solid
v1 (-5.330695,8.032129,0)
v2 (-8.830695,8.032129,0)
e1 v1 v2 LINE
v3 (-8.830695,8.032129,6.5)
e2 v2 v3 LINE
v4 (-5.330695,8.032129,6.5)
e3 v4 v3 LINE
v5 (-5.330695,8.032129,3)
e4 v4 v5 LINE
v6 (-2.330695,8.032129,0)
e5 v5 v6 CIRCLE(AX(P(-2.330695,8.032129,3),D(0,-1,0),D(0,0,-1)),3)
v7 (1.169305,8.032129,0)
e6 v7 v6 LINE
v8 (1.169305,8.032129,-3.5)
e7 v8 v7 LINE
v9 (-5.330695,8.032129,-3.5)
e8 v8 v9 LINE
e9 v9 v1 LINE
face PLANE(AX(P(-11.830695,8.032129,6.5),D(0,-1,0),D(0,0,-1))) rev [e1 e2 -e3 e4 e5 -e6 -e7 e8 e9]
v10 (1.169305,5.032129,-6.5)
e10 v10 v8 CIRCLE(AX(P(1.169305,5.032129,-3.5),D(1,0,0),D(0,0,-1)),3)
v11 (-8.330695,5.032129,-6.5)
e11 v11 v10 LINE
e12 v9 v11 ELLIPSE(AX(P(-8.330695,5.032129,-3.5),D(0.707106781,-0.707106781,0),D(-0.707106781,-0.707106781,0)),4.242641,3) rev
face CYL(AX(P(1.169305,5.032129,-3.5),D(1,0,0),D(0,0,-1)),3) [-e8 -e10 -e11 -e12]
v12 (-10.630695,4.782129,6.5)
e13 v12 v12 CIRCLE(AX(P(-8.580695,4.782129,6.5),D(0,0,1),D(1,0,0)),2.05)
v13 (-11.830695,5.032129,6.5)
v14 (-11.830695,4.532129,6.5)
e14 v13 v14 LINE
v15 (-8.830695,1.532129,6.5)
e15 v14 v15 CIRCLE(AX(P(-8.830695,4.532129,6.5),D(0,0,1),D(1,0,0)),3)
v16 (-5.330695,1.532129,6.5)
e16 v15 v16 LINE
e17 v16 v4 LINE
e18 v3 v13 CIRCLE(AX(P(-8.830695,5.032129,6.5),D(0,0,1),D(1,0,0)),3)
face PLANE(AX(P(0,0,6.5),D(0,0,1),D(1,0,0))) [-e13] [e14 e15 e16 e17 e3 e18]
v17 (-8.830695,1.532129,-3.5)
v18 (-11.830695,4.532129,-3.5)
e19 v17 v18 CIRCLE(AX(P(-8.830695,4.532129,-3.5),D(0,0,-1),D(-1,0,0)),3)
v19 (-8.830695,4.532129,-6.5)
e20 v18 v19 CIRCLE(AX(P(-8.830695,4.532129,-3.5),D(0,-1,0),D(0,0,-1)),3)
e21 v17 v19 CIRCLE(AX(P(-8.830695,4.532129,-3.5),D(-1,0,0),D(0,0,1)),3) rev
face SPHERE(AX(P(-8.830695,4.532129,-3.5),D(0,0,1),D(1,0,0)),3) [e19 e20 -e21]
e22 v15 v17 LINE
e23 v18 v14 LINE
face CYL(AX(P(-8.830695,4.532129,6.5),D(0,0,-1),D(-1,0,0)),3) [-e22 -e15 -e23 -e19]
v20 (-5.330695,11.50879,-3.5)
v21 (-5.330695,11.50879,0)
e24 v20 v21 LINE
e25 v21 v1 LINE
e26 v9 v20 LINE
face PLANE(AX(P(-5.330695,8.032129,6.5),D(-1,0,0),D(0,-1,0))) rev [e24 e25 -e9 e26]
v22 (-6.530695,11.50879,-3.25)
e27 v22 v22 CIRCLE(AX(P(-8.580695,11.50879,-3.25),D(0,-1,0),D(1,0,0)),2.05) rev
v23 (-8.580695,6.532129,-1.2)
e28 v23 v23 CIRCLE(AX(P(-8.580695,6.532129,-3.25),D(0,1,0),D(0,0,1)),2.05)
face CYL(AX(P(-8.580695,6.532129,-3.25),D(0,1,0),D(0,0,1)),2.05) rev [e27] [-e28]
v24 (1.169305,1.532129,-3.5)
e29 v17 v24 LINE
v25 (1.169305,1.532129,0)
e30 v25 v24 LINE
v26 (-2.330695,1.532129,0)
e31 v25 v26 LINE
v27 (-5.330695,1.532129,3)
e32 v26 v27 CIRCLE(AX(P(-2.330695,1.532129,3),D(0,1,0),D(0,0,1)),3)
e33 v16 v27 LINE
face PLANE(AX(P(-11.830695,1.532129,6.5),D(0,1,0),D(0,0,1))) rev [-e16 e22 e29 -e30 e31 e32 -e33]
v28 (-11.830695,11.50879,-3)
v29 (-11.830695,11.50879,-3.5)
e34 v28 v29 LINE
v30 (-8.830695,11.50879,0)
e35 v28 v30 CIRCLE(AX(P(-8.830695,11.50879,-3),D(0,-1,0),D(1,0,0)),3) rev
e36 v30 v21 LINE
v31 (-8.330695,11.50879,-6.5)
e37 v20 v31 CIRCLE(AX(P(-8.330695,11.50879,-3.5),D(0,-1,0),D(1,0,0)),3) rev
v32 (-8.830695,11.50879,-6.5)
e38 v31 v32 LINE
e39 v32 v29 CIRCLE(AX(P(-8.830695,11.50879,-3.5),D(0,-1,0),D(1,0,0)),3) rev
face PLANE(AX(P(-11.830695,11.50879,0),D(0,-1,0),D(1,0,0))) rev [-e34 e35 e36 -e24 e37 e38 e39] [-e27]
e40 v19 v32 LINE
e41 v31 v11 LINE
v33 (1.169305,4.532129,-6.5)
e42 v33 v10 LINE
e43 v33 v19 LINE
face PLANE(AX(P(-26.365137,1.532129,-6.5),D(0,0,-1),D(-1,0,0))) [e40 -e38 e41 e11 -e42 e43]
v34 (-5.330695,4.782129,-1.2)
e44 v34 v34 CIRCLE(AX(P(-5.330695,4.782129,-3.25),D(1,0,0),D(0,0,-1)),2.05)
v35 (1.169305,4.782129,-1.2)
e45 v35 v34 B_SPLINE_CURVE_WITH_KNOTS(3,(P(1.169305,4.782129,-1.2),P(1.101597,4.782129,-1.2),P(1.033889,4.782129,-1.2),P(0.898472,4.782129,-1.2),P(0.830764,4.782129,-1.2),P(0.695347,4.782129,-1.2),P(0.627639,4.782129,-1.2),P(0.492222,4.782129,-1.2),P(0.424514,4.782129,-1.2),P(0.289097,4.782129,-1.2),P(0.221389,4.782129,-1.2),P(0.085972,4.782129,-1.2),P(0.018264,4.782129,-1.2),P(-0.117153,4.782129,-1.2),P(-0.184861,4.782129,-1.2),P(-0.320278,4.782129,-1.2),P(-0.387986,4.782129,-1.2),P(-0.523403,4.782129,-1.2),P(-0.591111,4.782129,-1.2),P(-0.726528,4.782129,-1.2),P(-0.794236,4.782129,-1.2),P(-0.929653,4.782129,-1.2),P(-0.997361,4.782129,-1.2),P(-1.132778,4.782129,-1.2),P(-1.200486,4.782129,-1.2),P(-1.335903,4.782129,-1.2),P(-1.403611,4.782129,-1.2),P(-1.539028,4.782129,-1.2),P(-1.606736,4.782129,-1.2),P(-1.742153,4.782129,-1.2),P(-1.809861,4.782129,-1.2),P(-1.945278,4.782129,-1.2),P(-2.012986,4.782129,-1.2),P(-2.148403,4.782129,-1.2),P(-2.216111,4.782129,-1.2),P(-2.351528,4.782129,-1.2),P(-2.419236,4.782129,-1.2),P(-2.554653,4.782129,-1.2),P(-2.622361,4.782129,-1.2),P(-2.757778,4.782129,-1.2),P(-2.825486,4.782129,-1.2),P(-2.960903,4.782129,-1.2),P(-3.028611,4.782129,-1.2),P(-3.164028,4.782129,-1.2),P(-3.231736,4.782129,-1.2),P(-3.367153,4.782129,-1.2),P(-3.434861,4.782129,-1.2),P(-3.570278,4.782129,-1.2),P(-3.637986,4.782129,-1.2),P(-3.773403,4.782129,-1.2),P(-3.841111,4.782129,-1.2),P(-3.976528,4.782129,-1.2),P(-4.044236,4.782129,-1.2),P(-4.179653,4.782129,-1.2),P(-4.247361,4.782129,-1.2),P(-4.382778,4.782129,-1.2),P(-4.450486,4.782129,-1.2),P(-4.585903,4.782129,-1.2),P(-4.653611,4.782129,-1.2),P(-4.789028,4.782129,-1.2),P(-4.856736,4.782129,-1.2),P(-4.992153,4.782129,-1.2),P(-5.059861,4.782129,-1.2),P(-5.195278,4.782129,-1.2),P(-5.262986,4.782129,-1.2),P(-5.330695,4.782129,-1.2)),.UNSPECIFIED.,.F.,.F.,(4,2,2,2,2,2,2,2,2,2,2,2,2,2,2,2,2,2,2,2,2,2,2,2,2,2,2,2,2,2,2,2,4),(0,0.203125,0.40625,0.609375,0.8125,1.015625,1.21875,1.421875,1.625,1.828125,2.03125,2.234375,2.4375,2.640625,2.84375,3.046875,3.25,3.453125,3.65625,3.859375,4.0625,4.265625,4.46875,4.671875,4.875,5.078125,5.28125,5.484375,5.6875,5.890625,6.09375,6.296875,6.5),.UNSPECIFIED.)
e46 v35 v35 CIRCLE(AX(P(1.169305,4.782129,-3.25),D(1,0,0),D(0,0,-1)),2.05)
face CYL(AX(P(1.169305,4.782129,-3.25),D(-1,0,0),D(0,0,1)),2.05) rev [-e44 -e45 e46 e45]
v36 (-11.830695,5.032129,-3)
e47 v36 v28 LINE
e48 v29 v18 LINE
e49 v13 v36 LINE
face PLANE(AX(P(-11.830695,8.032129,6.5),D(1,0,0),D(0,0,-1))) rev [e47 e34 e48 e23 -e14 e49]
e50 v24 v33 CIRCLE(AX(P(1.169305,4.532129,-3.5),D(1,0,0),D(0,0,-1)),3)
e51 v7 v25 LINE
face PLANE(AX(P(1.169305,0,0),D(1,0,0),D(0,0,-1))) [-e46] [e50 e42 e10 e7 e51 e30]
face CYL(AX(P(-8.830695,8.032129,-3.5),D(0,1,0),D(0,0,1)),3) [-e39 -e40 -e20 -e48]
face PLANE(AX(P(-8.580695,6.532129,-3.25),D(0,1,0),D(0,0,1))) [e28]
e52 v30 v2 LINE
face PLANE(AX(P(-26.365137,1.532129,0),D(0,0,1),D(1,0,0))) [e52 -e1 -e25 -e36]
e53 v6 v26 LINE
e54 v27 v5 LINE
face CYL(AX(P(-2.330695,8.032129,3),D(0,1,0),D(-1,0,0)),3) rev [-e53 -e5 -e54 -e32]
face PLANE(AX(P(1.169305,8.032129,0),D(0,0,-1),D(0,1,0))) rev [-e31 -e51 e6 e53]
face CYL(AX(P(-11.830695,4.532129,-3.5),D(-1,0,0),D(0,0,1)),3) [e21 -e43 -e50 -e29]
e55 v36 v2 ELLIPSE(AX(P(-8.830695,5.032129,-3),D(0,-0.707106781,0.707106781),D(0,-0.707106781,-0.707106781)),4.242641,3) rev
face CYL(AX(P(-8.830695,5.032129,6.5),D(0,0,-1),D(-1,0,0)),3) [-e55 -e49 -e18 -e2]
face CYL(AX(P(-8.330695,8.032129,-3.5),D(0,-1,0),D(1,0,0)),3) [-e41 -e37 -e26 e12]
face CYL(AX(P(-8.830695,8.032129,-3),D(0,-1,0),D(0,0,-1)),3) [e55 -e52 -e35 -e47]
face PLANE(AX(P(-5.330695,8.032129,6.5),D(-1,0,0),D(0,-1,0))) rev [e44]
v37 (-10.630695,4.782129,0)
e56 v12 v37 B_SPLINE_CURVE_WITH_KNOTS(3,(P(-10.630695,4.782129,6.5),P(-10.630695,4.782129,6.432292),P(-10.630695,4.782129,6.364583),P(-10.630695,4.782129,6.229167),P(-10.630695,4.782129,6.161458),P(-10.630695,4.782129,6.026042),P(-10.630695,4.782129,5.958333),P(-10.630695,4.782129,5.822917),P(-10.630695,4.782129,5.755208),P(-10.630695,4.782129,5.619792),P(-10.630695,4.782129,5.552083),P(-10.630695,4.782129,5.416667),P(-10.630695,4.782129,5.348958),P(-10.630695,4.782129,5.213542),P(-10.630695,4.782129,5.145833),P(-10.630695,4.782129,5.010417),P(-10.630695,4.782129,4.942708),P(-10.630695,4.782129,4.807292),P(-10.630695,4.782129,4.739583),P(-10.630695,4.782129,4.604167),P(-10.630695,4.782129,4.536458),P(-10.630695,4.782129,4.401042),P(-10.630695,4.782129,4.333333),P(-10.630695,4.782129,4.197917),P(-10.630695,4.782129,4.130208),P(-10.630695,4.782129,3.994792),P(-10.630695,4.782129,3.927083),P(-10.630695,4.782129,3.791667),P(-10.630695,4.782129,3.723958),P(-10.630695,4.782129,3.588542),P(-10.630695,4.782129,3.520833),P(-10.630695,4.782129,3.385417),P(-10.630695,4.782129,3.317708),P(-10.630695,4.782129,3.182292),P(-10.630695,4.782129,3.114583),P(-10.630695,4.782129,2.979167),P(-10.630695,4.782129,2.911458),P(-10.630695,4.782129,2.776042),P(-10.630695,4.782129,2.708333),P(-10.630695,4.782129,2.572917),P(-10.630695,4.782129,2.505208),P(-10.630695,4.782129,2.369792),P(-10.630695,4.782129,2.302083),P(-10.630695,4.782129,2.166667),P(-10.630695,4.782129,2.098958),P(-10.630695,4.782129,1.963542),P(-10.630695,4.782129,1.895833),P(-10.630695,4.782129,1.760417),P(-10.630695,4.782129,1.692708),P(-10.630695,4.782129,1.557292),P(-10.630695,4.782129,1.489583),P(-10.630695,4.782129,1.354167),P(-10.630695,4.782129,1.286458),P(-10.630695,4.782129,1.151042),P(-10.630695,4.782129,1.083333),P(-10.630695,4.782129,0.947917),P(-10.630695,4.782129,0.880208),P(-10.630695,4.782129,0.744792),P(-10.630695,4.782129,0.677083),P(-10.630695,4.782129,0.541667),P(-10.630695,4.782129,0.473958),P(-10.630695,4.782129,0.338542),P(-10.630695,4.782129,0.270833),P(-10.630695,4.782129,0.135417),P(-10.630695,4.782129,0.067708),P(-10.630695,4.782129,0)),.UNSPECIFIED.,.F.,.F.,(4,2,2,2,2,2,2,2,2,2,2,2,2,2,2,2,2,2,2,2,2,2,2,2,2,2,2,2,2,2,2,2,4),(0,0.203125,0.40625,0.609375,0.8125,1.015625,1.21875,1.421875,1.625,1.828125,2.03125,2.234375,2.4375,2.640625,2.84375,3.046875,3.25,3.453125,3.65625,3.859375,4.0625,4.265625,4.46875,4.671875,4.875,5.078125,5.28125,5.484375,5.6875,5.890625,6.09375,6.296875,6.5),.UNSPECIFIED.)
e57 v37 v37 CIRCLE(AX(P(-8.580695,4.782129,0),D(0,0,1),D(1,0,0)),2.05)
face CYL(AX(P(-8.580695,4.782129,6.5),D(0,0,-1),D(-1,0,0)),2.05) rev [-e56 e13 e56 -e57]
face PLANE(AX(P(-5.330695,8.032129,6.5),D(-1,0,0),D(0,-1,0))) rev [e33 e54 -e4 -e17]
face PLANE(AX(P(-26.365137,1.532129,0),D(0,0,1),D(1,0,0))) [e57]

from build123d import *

# Parameters (mm, degrees)
SKETCH_1_W               = 6.5
SKETCH_1_H               = 6.5
SKETCH_1_R               = 2.05
EXTRUDE_1_DEPTH          = 6.5
SKETCH_2_W               = 6.5
SKETCH_2_H               = 13
EXTRUDE_2_DEPTH          = 6.5
SKETCH_3_W               = 6.5
SKETCH_3_H               = 6.5
SKETCH_3_R               = 2.05
EXTRUDE_3_DEPTH          = 6.5
SKETCH_4_R               = 2.05
CUT_EXTRUDE_1_DEPTH      = 8
FILLET_1_R               = 3
FILLET_2_R               = 3
CUT_EXTRUDE_2_DEPTH      = 18.195428818
CUT_EXTRUDE_2_DEPTH_BACK = 18.195428818
SKETCH_5_W               = 7.542755484
SKETCH_5_H               = 3.936219418


with BuildPart() as part:
    # 草图1 → 凸台-拉伸1 (new body)
    with BuildSketch(Plane.XY):
        with Locations((-8.580694703, 4.782128964)):
            Rectangle(SKETCH_1_W, SKETCH_1_H)
        with Locations(Location((-8.580694703, 4.782128964, 0), (0, 0, 180))):
            Circle(SKETCH_1_R, mode=Mode.SUBTRACT)
    extrude(amount=EXTRUDE_1_DEPTH)

    # 草图2 → 凸台-拉伸2 (add)
    with BuildSketch(Plane(origin=(-5.330694703, 0, 0), x_dir=(0, 0, -1), z_dir=(1, 0, 0))):
        with Locations((3.25, 8.032128964)):
            Rectangle(SKETCH_2_W, SKETCH_2_H)
    extrude(amount=-EXTRUDE_2_DEPTH)

    # 草图3 → 凸台-拉伸3 (add)
    with BuildSketch(Plane(origin=(-5.330694703, 0, 0), x_dir=(0, 0, -1), z_dir=(1, 0, 0))):
        with Locations((3.25, 4.782128964)):
            Rectangle(SKETCH_3_W, SKETCH_3_H)
        with Locations(Location((3.25, 4.782128964, 0), (0, 0, 180))):
            Circle(SKETCH_3_R, mode=Mode.SUBTRACT)
    extrude(amount=EXTRUDE_3_DEPTH)

    # 草图4 → 切除-拉伸1 (cut)
    with BuildSketch(Plane(origin=(0, 14.532128964, 0), x_dir=(1, 0, 0), z_dir=(0, 1, 0))):
        with Locations(Location((-8.580694703, 3.25, 0), (0, 0, 270))):
            Circle(SKETCH_4_R)
    extrude(amount=-CUT_EXTRUDE_1_DEPTH, mode=Mode.SUBTRACT)

    # 圆角1
    fillet_1_edges = [part.edges().sort_by_distance(p)[0] for p in [
        (-5.330694703, 1.532128964, -6.5),
        (-11.830694703, 11.282128964, 0),
        (-11.830694703, 8.032128964, -6.5),
        (-5.330694703, 11.282128964, -6.5),
        (-2.080694703, 8.032128964, -6.5),
        (-11.830694703, 1.532128964, 0),
        (-11.830694703, 8.032128964, 3.25),
    ]]
    fillet(fillet_1_edges, radius=FILLET_1_R)

    # 圆角2
    # the kernel refuses this fillet: 3 mm, written as the material it adds along each edge
    with BuildSketch(Plane(origin=(-5.330694703, 1.532128964, 0), x_dir=(0, 0, 1), z_dir=(0, 1, 0))) as fillet_2_piece_1:
        with BuildLine():
            CenterArc((FILLET_2_R, FILLET_2_R), FILLET_2_R, 180, 90)
            Line((0, FILLET_2_R), (0, 0))
            Line((0, 0), (FILLET_2_R, 0))
        make_face()
    extrude(amount=6.5)

    # 草图5 → 切除-拉伸2 (cut, two sides: drawn at the far end of the back side and taken through both)
    with BuildSketch(Plane(origin=(-5.330694703, 0, 0), x_dir=(0, 0, -1), z_dir=(1, 0, 0)).offset(-CUT_EXTRUDE_2_DEPTH_BACK)):
        with Locations((3.771377742, 13.476899479)):
            Rectangle(SKETCH_5_W, SKETCH_5_H)
    extrude(amount=CUT_EXTRUDE_2_DEPTH + CUT_EXTRUDE_2_DEPTH_BACK, mode=Mode.SUBTRACT)


solid = part.part
